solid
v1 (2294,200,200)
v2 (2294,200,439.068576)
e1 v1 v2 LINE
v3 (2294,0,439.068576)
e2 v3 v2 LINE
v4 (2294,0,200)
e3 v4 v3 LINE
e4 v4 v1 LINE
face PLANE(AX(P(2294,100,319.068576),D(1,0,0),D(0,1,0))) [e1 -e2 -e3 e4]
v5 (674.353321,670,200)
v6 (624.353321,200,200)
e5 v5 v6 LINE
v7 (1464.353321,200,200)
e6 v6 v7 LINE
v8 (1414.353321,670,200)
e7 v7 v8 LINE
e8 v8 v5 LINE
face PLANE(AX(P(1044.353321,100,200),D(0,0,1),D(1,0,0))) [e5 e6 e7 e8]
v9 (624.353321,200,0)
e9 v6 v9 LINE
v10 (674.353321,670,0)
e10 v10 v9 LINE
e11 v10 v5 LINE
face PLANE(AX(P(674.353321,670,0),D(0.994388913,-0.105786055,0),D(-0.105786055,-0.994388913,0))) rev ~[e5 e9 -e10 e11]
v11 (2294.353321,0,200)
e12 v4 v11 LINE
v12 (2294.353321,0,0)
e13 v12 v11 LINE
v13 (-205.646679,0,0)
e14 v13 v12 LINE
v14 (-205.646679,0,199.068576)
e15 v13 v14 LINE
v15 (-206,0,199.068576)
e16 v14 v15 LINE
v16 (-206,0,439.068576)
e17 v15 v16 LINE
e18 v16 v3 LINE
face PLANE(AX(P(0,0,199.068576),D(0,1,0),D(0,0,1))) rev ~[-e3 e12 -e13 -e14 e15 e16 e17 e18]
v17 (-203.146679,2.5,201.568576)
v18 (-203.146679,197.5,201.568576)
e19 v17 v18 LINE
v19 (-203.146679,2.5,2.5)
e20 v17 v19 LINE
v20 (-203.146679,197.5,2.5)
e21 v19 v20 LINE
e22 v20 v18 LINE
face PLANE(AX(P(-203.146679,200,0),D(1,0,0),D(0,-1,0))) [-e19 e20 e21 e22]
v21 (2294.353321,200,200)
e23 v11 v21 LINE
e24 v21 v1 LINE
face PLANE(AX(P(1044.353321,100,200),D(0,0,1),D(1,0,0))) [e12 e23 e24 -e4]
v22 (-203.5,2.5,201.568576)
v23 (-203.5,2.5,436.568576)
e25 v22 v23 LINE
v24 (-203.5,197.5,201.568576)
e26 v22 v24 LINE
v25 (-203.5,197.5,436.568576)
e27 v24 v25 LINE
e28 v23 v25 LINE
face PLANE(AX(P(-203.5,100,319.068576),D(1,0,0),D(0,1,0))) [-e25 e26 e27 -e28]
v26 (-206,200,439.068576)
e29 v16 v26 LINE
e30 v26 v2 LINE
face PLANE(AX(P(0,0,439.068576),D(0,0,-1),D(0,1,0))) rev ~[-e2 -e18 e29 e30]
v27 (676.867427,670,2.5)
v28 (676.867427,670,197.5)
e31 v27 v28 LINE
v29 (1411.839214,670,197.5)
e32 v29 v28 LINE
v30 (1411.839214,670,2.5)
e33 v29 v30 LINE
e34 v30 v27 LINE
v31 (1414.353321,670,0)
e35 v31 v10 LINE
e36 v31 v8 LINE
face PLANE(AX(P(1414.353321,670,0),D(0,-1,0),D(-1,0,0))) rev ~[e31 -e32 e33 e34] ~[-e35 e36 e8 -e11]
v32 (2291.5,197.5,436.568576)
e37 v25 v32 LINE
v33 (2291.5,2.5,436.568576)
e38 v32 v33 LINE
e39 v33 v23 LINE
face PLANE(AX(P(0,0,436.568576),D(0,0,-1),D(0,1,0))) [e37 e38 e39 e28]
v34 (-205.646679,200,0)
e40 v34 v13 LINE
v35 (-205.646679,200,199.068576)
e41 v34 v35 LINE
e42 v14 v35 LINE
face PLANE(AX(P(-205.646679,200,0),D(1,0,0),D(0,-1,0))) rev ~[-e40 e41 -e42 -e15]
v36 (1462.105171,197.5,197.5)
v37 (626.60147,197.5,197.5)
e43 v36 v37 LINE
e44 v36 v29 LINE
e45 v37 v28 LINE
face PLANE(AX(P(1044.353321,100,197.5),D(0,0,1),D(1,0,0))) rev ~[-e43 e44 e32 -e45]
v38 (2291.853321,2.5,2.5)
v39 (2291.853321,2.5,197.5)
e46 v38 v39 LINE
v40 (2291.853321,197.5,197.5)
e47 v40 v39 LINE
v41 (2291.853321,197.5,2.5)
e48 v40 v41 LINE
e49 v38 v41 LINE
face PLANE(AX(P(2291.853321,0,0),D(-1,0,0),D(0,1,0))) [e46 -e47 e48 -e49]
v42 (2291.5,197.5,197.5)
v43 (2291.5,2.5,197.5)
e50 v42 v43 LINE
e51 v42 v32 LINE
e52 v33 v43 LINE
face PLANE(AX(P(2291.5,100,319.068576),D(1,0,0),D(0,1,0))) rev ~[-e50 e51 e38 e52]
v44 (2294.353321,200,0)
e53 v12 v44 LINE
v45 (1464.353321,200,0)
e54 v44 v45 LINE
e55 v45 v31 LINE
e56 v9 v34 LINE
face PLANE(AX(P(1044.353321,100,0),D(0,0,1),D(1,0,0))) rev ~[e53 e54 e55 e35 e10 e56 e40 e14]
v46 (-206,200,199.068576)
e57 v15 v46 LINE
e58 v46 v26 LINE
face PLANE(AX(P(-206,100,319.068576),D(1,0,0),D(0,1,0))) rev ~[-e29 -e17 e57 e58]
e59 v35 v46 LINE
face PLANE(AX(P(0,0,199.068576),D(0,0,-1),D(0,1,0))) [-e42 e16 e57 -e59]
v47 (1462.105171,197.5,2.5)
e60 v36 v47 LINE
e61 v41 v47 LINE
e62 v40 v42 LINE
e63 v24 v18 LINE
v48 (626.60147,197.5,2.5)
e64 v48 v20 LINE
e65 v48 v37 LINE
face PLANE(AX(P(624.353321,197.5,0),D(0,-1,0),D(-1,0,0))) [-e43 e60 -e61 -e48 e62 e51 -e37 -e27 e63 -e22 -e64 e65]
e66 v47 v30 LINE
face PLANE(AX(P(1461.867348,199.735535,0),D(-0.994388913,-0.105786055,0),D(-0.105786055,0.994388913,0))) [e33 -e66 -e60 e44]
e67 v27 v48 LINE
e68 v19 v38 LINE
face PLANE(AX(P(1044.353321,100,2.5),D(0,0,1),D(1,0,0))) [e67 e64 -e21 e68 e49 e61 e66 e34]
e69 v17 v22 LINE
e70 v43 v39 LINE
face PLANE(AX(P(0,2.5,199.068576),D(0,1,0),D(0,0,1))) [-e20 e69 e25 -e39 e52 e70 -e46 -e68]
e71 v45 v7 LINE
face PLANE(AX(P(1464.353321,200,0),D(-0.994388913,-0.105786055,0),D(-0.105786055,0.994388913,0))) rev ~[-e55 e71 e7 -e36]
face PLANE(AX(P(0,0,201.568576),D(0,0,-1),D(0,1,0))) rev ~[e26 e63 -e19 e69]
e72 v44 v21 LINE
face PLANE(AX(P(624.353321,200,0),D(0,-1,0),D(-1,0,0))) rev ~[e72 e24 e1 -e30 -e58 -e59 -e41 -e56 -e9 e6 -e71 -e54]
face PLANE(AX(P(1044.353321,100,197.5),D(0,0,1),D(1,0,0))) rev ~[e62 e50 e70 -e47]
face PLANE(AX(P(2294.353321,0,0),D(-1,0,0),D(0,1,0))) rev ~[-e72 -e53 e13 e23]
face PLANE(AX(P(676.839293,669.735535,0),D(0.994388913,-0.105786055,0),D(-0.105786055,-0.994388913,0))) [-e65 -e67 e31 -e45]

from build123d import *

# Parameters (mm, degrees)
F1_DEPTH      = 200
F2_W          = 200
F2_H          = 240
F3_DEPTH      = 2294
F3_DEPTH_BACK = 206
F4_T          = -2.5


with BuildPart() as f1:
    # F0 (on Top) → F1 (new body)
    with BuildSketch(Plane.XY):
        Polygon((-205.6466794014, 200), (-205.6466794014, 0), (2294.3533205986, 0), (2294.3533205986, 200), (1464.3533205986, 200), (1044.3533205986, 200), (624.3533205986, 200), align=None)
        Polygon((674.3533205986, 670), (624.3533205986, 200), (1044.3533205986, 200), (1044.3533205986, 670), align=None)
        Polygon((1044.3533205986, 200), (1464.3533205986, 200), (1414.3533205986, 670), (1044.3533205986, 670), align=None)
    extrude(amount=F1_DEPTH)

    # F2 (on Right) → F3 (join, two sides)
    with BuildSketch(Plane.YZ) as f3_sk:
        with Locations((100, 319.0685760975)):
            Rectangle(F2_W, F2_H)
    extrude(amount=F3_DEPTH)
    extrude(f3_sk.sketch, amount=-F3_DEPTH_BACK)

    # F4
    f4_openings = [f1.faces().sort_by_distance(p)[0] for p in [
        (1044.353321, 670, 100),
    ]]
    offset(amount=F4_T, openings=f4_openings, kind=Kind.INTERSECTION)


solid = f1.part
